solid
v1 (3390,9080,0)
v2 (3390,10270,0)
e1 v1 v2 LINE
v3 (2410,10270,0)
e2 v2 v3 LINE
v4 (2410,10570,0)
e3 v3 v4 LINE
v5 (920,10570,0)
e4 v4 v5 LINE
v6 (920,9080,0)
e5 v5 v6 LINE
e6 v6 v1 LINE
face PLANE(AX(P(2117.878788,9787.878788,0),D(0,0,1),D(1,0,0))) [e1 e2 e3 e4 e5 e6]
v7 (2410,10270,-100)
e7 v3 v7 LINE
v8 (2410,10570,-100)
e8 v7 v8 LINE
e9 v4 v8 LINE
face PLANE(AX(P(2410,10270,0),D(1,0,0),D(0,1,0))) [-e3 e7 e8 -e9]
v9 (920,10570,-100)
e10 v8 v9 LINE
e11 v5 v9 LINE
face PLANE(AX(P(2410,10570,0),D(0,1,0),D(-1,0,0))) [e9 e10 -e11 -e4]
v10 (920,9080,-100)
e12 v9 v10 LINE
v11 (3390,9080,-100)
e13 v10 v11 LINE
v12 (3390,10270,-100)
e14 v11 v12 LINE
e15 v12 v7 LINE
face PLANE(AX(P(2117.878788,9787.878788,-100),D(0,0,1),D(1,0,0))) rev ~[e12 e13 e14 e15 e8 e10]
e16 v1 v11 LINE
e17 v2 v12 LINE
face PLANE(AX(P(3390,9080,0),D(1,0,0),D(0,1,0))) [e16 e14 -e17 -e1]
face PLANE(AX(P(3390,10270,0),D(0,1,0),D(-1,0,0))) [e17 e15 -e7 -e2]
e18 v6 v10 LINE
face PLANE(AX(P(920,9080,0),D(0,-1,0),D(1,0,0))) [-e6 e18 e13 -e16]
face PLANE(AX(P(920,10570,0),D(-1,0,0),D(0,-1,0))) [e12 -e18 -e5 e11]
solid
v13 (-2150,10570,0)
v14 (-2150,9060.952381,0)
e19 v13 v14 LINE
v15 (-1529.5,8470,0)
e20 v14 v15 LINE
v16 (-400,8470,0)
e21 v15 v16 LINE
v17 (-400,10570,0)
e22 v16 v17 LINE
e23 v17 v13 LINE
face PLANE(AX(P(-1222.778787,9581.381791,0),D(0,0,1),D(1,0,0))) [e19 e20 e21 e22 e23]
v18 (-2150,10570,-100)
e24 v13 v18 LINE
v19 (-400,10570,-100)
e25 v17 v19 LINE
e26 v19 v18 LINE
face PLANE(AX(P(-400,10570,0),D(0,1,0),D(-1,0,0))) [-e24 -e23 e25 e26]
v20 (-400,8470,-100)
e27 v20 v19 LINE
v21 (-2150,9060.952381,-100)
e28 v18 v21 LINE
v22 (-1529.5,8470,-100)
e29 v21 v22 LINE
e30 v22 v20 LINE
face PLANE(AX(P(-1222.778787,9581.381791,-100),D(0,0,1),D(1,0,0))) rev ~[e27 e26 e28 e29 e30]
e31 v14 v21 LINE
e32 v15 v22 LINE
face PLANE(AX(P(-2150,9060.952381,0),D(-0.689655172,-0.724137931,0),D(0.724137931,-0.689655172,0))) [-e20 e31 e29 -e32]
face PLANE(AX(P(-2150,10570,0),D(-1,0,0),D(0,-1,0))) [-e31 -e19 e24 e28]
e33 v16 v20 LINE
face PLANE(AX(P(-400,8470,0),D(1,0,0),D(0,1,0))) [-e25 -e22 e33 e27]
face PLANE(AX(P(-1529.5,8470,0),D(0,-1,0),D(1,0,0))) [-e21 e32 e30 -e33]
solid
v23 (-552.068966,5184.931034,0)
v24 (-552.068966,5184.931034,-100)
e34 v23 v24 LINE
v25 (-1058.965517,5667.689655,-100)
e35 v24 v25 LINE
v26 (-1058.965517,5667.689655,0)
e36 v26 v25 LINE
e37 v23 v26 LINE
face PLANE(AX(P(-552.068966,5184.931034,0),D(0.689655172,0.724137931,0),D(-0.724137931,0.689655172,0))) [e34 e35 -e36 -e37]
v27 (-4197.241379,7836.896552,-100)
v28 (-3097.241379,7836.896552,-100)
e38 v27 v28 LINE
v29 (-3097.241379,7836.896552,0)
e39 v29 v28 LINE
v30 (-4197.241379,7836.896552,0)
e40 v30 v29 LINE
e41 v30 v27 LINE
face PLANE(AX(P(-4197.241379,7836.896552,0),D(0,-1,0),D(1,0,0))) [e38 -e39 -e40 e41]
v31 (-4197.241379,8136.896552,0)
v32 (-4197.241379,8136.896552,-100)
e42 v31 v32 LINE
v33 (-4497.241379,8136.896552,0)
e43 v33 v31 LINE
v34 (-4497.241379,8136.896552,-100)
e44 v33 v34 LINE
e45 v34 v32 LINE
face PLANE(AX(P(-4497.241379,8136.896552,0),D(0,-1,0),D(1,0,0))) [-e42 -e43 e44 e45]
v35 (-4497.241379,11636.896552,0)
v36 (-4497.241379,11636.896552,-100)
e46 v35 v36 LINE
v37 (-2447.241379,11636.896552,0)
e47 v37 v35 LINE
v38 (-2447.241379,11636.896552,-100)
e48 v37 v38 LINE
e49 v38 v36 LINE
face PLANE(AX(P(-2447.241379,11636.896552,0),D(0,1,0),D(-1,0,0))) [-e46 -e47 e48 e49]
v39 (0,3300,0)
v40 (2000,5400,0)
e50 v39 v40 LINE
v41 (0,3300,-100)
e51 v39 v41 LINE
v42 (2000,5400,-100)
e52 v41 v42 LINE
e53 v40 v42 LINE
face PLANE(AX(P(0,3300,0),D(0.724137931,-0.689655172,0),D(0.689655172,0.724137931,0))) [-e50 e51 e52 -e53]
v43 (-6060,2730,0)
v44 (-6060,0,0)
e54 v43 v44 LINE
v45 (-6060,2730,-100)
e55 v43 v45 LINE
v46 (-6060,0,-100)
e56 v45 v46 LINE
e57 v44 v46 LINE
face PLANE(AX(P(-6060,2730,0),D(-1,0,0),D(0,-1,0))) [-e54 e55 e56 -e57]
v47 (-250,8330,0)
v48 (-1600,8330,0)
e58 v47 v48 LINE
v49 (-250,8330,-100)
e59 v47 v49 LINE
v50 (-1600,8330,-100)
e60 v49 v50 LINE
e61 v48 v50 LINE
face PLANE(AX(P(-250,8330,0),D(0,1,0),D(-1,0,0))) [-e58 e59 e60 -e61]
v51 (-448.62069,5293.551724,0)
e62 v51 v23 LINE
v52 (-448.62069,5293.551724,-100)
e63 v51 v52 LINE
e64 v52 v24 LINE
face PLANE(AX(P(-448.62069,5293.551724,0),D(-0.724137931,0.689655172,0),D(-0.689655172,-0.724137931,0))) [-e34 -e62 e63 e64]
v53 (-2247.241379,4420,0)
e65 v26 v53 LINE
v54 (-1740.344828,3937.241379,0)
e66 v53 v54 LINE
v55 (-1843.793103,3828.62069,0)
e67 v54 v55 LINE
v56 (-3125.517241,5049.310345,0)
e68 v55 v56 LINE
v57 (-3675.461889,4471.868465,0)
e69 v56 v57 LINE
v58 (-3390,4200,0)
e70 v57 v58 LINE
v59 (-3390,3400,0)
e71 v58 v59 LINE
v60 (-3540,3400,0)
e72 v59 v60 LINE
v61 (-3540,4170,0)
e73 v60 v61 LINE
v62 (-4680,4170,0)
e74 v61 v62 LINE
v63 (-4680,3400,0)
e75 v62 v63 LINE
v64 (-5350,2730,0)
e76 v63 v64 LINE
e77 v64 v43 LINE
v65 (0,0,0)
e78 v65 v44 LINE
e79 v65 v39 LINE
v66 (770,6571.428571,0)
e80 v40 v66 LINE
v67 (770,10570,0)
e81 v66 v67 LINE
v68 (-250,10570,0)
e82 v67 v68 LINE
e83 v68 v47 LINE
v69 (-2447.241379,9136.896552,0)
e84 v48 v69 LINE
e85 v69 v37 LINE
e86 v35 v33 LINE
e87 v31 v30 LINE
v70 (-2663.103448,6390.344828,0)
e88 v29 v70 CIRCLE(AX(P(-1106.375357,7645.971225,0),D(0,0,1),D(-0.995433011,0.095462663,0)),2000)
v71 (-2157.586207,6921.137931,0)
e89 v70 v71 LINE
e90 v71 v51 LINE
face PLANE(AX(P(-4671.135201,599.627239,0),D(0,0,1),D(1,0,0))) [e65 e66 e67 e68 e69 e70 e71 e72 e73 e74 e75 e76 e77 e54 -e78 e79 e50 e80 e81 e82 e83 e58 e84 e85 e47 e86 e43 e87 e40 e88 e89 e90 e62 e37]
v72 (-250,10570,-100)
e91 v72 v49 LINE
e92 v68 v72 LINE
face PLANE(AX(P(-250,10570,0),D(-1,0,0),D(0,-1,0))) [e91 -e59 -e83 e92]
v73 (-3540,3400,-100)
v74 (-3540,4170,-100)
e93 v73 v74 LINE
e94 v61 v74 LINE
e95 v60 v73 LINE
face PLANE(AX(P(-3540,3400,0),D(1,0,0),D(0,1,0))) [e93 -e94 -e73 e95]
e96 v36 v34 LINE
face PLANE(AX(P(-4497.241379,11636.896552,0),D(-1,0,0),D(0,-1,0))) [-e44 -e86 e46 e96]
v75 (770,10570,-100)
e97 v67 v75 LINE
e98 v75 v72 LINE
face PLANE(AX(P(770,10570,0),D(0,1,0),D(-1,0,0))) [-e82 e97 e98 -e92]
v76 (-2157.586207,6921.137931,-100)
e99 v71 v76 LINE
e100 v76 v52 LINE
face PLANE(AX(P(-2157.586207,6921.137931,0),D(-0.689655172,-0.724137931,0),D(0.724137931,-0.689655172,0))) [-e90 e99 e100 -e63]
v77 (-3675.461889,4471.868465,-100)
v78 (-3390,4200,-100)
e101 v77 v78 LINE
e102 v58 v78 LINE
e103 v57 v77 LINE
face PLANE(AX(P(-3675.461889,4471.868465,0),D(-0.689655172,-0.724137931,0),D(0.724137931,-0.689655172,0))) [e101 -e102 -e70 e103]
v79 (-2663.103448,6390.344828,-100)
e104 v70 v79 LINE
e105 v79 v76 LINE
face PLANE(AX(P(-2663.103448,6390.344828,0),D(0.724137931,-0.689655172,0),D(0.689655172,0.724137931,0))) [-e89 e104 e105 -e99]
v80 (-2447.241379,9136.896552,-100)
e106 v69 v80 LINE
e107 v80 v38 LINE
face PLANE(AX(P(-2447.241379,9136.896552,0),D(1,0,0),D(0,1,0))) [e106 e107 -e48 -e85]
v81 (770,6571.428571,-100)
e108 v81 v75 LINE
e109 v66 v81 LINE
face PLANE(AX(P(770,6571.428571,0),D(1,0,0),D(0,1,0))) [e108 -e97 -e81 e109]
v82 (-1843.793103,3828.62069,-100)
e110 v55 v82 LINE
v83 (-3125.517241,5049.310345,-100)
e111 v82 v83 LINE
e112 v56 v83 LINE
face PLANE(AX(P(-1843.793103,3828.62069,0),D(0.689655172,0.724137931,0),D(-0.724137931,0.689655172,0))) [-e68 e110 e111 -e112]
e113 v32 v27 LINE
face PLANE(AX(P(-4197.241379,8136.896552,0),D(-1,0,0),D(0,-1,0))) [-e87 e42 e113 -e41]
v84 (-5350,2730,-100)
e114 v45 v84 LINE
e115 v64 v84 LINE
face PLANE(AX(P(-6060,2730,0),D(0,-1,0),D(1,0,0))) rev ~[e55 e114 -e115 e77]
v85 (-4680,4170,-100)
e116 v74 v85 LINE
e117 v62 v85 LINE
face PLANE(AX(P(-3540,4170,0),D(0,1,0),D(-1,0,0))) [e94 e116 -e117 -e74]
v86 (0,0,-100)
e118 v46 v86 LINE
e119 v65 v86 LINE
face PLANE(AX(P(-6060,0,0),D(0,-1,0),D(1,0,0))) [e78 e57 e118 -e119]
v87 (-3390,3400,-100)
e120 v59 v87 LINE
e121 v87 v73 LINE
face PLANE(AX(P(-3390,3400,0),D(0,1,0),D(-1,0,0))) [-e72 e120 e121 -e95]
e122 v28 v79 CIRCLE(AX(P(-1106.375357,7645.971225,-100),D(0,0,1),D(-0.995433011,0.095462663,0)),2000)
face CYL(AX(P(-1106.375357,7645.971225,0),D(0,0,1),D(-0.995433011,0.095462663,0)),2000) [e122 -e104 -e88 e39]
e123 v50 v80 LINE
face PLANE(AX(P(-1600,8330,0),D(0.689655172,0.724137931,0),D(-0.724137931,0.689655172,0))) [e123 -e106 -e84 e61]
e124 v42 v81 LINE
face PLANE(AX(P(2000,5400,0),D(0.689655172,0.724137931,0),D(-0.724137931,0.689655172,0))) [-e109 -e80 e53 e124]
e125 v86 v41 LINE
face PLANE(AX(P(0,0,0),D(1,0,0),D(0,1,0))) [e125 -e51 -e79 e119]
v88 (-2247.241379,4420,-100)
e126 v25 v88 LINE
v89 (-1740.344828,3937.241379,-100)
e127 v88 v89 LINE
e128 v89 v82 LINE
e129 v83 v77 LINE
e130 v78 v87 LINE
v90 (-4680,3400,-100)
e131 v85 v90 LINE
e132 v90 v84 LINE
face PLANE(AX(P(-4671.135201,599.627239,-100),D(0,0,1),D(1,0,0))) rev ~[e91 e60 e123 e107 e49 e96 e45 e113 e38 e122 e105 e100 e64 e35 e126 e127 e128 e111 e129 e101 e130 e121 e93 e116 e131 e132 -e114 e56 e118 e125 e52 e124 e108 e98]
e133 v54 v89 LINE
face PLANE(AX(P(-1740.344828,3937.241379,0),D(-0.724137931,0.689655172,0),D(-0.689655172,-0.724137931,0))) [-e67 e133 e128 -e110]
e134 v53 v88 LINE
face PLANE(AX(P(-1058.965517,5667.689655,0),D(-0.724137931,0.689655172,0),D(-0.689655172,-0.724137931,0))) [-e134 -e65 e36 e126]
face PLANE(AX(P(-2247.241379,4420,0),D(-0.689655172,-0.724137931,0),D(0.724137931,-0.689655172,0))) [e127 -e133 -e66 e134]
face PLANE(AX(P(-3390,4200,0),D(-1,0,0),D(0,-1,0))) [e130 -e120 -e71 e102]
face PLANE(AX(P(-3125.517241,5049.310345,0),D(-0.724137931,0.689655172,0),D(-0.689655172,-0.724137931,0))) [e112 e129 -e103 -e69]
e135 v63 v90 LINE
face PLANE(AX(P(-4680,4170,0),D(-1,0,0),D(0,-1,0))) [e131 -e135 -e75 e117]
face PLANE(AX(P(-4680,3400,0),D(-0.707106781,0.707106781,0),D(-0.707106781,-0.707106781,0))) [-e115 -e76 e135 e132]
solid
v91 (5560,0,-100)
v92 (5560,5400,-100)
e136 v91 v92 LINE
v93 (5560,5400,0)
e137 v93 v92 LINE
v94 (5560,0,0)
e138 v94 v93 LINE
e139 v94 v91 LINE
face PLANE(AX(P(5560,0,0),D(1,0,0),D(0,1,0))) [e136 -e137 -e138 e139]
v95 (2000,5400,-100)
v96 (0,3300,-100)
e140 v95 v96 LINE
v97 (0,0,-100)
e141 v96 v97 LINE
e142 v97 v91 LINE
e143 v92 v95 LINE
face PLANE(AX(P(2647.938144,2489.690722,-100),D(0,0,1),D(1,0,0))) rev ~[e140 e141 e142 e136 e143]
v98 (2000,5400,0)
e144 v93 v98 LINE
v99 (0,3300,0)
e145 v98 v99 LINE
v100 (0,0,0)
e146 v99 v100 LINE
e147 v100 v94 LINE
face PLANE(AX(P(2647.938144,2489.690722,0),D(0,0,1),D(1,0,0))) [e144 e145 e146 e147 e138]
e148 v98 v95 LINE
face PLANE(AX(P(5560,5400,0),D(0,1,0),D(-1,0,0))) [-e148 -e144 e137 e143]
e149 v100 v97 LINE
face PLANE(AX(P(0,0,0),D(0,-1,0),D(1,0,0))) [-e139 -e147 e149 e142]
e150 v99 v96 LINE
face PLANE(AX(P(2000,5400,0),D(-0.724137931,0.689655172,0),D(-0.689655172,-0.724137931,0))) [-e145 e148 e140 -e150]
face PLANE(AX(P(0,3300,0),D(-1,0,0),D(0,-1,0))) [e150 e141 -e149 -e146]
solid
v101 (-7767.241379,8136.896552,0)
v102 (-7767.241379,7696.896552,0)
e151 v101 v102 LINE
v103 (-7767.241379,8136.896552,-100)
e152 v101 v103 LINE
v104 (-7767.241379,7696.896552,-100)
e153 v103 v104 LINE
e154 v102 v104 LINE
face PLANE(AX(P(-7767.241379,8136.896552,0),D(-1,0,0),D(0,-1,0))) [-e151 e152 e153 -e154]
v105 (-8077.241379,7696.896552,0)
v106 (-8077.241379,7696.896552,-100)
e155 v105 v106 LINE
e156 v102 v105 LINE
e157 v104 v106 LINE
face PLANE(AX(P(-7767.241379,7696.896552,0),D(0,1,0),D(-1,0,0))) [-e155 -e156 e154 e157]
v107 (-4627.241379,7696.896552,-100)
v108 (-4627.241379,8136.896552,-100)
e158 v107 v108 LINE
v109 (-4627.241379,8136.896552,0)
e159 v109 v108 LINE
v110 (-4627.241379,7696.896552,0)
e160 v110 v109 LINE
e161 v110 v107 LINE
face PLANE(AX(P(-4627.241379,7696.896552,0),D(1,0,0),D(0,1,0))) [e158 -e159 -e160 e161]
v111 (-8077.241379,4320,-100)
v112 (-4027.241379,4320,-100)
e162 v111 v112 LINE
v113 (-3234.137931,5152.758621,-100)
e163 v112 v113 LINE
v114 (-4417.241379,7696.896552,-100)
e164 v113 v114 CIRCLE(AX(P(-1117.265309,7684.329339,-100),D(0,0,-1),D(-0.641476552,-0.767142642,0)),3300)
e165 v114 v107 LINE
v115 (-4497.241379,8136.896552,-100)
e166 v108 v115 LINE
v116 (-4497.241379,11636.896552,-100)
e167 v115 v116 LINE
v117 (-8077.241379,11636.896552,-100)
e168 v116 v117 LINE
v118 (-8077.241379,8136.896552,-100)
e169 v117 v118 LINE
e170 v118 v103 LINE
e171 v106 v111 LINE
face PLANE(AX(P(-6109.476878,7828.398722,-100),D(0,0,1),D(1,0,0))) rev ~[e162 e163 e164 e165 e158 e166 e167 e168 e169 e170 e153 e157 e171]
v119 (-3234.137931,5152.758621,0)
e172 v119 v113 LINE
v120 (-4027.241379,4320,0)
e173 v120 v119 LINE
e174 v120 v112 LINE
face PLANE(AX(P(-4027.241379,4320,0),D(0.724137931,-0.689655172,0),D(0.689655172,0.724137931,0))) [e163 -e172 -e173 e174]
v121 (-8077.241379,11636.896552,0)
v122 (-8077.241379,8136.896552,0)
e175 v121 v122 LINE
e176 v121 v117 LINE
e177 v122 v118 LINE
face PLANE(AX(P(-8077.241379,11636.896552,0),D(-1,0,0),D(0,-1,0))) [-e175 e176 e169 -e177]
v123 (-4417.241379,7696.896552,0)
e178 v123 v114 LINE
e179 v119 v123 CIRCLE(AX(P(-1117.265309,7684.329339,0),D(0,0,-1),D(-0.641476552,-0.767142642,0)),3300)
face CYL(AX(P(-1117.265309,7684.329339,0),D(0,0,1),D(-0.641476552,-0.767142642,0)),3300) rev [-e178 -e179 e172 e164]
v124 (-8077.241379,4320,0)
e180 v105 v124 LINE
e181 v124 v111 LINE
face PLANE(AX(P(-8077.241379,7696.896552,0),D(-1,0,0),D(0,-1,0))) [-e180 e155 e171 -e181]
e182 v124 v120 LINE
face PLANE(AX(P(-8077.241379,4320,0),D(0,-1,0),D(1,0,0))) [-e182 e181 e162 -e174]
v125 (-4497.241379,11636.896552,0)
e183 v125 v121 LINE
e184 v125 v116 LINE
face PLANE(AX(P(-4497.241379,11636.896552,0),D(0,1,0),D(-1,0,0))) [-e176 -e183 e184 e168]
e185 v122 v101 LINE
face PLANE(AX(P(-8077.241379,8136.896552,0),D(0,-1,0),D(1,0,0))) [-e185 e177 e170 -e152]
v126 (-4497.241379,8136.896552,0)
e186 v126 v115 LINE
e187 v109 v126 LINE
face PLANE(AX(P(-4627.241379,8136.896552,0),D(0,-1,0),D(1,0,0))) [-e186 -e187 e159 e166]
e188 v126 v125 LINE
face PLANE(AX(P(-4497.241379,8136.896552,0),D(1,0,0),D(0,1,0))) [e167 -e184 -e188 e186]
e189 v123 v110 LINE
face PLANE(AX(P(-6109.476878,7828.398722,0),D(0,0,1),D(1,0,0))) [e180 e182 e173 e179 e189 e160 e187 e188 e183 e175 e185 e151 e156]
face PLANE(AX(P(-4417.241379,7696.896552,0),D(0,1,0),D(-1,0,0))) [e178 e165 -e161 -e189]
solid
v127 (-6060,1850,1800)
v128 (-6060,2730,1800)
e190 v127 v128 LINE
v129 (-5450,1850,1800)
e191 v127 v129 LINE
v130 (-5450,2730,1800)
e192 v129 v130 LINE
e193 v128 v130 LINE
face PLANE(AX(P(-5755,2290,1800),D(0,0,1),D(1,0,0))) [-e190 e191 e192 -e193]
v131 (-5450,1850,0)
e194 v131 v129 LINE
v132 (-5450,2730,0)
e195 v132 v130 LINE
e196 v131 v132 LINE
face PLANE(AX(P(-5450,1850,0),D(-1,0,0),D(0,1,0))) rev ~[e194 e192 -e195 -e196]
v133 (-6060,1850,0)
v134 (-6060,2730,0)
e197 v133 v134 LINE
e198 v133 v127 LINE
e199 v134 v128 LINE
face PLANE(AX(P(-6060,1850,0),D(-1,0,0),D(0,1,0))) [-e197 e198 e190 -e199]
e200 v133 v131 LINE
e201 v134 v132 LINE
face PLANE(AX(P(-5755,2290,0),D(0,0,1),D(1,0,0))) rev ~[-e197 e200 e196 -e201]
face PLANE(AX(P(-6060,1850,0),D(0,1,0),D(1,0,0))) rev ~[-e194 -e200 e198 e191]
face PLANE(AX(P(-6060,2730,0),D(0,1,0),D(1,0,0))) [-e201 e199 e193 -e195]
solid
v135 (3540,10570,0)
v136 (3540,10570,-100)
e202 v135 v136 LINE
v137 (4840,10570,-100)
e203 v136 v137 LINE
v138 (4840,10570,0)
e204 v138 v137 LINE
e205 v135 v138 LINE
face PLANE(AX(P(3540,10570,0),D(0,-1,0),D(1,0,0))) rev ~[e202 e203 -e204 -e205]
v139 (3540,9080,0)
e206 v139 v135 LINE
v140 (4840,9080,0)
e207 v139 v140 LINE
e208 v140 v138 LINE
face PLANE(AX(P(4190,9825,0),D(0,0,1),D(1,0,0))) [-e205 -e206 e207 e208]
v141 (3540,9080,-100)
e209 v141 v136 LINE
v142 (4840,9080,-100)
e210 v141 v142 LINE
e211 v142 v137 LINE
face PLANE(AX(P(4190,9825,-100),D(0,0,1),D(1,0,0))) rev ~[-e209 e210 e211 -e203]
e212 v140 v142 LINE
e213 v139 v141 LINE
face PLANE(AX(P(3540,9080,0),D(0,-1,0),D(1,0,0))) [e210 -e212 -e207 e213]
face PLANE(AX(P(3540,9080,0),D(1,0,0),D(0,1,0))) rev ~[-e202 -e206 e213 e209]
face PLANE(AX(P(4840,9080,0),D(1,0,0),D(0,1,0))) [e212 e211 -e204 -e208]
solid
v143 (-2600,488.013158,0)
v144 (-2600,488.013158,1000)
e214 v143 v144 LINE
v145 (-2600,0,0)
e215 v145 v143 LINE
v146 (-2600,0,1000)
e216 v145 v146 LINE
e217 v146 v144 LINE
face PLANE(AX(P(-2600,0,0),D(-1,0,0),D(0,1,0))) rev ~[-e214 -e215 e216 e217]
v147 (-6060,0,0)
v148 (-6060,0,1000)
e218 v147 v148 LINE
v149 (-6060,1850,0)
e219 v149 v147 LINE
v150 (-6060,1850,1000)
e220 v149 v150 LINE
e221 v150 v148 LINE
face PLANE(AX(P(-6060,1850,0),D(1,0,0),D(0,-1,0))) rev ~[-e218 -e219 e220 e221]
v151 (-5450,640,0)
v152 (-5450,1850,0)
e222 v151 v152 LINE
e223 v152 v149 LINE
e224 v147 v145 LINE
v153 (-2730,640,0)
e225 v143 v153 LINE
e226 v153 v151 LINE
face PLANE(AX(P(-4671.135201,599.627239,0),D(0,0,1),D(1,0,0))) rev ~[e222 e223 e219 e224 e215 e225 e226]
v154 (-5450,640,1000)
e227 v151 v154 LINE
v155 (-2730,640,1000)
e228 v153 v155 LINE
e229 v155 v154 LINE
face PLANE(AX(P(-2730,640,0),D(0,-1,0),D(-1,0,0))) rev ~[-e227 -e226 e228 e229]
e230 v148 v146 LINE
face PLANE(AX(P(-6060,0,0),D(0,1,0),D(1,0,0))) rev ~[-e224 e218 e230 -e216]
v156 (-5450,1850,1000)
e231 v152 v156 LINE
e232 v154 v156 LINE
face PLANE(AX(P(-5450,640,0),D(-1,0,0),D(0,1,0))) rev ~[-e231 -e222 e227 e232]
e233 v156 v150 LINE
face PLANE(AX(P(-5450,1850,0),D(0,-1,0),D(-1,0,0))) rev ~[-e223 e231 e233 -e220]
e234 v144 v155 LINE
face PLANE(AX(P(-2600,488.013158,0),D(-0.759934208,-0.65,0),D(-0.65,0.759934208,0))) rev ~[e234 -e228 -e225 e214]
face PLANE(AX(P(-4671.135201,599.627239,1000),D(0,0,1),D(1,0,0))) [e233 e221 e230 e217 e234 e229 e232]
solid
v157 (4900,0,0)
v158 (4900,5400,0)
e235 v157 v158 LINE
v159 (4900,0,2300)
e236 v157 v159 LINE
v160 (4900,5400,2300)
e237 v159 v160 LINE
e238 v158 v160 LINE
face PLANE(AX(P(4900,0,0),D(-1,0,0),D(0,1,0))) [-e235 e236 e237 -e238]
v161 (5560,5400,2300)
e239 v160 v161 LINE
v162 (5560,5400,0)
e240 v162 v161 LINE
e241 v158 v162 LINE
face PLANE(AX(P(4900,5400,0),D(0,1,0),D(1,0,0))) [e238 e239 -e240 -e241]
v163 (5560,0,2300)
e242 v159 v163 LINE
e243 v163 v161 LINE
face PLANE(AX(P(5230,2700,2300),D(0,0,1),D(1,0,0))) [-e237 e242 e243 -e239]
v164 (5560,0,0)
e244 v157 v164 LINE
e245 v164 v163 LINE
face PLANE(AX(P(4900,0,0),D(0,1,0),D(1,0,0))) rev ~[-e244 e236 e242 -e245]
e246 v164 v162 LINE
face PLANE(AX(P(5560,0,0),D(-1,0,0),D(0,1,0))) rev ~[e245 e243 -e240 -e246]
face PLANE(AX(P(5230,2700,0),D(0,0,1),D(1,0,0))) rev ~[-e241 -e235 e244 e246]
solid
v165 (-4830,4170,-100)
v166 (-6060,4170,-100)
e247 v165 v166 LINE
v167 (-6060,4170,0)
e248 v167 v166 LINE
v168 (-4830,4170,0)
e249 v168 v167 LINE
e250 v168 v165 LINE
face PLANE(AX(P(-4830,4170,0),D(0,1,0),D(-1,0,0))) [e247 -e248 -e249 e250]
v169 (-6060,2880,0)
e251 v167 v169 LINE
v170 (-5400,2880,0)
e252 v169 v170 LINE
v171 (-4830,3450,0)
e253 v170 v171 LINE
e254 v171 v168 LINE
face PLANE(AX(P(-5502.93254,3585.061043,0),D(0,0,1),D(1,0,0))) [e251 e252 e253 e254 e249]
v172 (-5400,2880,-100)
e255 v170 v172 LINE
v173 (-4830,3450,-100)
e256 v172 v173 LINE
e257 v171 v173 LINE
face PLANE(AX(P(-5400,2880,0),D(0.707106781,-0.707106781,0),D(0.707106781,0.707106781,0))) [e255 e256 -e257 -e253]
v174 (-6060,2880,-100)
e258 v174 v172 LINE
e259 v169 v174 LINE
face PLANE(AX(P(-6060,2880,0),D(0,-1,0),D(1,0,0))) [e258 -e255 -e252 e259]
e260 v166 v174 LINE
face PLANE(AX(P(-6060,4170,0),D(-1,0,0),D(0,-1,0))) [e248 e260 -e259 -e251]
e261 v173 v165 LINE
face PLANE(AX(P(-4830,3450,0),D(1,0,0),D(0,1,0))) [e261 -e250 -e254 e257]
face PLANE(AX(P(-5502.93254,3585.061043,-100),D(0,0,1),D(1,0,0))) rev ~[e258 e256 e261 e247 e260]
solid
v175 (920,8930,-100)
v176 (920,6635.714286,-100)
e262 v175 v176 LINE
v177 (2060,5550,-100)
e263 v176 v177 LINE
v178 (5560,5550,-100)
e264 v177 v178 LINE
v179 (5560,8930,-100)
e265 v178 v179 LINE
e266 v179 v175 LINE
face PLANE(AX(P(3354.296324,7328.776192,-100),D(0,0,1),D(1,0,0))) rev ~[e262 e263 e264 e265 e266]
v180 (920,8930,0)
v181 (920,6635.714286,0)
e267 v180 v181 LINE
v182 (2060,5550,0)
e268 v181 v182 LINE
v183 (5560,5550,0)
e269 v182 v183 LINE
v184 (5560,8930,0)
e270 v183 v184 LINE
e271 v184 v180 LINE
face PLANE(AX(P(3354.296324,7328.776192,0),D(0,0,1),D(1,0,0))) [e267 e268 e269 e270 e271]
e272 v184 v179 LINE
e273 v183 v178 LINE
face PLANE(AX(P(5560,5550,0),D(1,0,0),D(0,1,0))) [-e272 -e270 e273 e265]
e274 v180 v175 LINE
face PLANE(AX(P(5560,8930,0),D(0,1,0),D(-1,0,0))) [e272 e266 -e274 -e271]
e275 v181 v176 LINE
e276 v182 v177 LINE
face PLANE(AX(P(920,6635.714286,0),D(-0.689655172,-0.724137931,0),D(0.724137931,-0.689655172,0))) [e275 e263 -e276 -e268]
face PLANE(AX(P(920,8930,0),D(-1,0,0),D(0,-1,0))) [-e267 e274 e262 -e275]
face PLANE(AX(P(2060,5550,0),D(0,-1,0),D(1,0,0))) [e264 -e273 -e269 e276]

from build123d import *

# Parameters (mm, degrees)
F1_DEPTH  = 100
F0_W      = 660
F0_H      = 5400
F2_DEPTH  = 100
F3_DEPTH  = 100
F4_DEPTH  = 100
F5_DEPTH  = 100
F0_W_2    = 1300
F0_H_2    = 1490
F6_DEPTH  = 100
F7_DEPTH  = 100
F0_W_3    = 610
F0_H_3    = 880
F8_DEPTH  = 100
F9_DEPTH  = 1000
F10_DEPTH = 1800
F11_DEPTH = 2300


# Not quite as in the source:
# - a feature names something its author has since deleted; it is built from what else it names


with BuildPart() as f1:
    # F0 (on Top) → F1 (new body)
    with BuildSketch(Plane.XY):
        with BuildLine():
            Line((-2600, 488.0131584643), (-2600, 0))
            Line((-2600, 0), (0, 0))
            Line((0, 0), (0, 3300))
            Line((0, 3300), (2000, 5400))
            Line((2000, 5400), (770, 6571.4285714286))
            Line((770, 6571.4285714286), (770, 10570))
            Line((770, 10570), (-250, 10570))
            Line((-250, 10570), (-250, 8330))
            Line((-250, 8330), (-1600, 8330))
            Line((-1600, 8330), (-2447.2413793103, 9136.8965517241))
            Line((-2447.2413793103, 9136.8965517241), (-2447.2413793103, 11636.8965517241))
            Line((-2447.2413793103, 11636.8965517241), (-4497.2413793103, 11636.8965517241))
            Line((-4497.2413793103, 11636.8965517241), (-4497.2413793103, 8136.8965517241))
            Line((-4497.2413793103, 8136.8965517241), (-4197.2413793103, 8136.8965517241))
            Line((-4197.2413793103, 8136.8965517241), (-4197.2413793103, 7836.8965517241))
            Line((-4197.2413793103, 7836.8965517241), (-3097.2413793103, 7836.8965517241))
            ThreePointArc((-3097.2413793103, 7836.8965517241), (-3021.9650759345, 7071.0659908147), (-2663.1034482759, 6390.3448275862))
            Line((-2663.1034482759, 6390.3448275862), (-2157.5862068966, 6921.1379310345))
            Line((-2157.5862068966, 6921.1379310345), (-448.6206896552, 5293.5517241379))
            Line((-448.6206896552, 5293.5517241379), (-552.0689655172, 5184.9310344828))
            Line((-552.0689655172, 5184.9310344828), (-1058.9655172414, 5667.6896551724))
            Line((-1058.9655172414, 5667.6896551724), (-2247.2413793103, 4420))
            Line((-2247.2413793103, 4420), (-1740.3448275862, 3937.2413793103))
            Line((-1740.3448275862, 3937.2413793103), (-1843.7931034483, 3828.6206896552))
            Line((-1843.7931034483, 3828.6206896552), (-3125.5172413793, 5049.3103448276))
            Line((-3125.5172413793, 5049.3103448276), (-3675.4618885563, 4471.8684652917))
            Line((-3675.4618885563, 4471.8684652917), (-3390, 4200))
            Line((-3390, 4200), (-3390, 3400))
            Line((-3390, 3400), (-3540, 3400))
            Line((-3540, 3400), (-3540, 4170))
            Line((-3540, 4170), (-4680, 4170))
            Line((-4680, 4170), (-4680, 3400))
            Line((-4680, 3400), (-4821.4213562373, 3258.5786437627))
            Line((-4821.4213562373, 3258.5786437627), (-5350, 2730))
            Line((-5350, 2730), (-5450, 2730))
            Line((-5450, 2730), (-5450, 1850))
            Line((-5450, 1850), (-5450, 640))
            Line((-5450, 640), (-2730, 640))
            Line((-2730, 640), (-2600, 488.0131584643))
        make_face()
    extrude(amount=-F1_DEPTH)

    # F0 (on Top) → F8 (join)
    with BuildSketch(Plane.XY):
        Polygon((-6060, 0), (-2600, 0), (-2600, 488.0131584643), (-2730, 640), (-5450, 640), (-5450, 1850), (-6060, 1850), align=None)
        with Locations((-5755, 2290)):
            Rectangle(F0_W_3, F0_H_3)
    extrude(amount=-F8_DEPTH)


with BuildPart() as f1b:
    # F0 (on Top) → F1, piece 2 (new body)
    with BuildSketch(Plane.XY):
        Polygon((-6060, 4170), (-6060, 2880), (-5400, 2880), (-4921.4213562373, 3358.5786437627), (-4830, 3450), (-4830, 4170), (-5900, 4170), align=None)
    extrude(amount=-F1_DEPTH)


with BuildPart() as f2:
    # F0 (on Top) → F2 (new body)
    with BuildSketch(Plane.XY):
        Polygon((0, 3300), (0, 0), (4900, 0), (4900, 5400), (2000, 5400), align=None)
        with Locations((5230, 2700)):
            Rectangle(F0_W, F0_H)
    extrude(amount=-F2_DEPTH)


with BuildPart() as f3:
    # F0 (on Top) → F3 (new body)
    with BuildSketch(Plane.XY):
        with BuildLine():
            Line((-8077.2413793103, 4320), (-6060, 4320))
            Line((-6060, 4320), (-4027.2413793103, 4320))
            Line((-4027.2413793103, 4320), (-3234.1379310345, 5152.7586206897))
            ThreePointArc((-3234.1379310345, 5152.7586206897), (-4109.5423503056, 6292.8272342142), (-4417.2413793103, 7696.8965517241))
            Line((-4417.2413793103, 7696.8965517241), (-4627.2413793103, 7696.8965517241))
            Line((-4627.2413793103, 7696.8965517241), (-4627.2413793103, 8136.8965517241))
            Line((-4627.2413793103, 8136.8965517241), (-4497.2413793103, 8136.8965517241))
            Line((-4497.2413793103, 8136.8965517241), (-4497.2413793103, 11636.8965517241))
            Line((-4497.2413793103, 11636.8965517241), (-8077.2413793103, 11636.8965517241))
            Line((-8077.2413793103, 11636.8965517241), (-8077.2413793103, 8136.8965517241))
            Line((-8077.2413793103, 8136.8965517241), (-7767.2413793103, 8136.8965517241))
            Line((-7767.2413793103, 8136.8965517241), (-7767.2413793103, 7696.8965517241))
            Line((-7767.2413793103, 7696.8965517241), (-8077.2413793103, 7696.8965517241))
            Line((-8077.2413793103, 7696.8965517241), (-8077.2413793103, 4320))
        make_face()
    extrude(amount=-F3_DEPTH)


with BuildPart() as f4:
    # F0 (on Top) → F4 (new body)
    with BuildSketch(Plane.XY):
        Polygon((-400, 8470), (-400, 10570), (-2150, 10570), (-2150, 9060.9523809524), (-1529.5, 8470), align=None)
    extrude(amount=-F4_DEPTH)


with BuildPart() as f5:
    # F0 (on Top) → F5 (new body)
    with BuildSketch(Plane.XY):
        Polygon((4900, 5550), (5560, 5550), (5560, 8930), (920, 8930), (920, 6635.7142857143), (2060, 5550), align=None)
    extrude(amount=-F5_DEPTH)


with BuildPart() as f6:
    # F0 (on Top) → F6 (new body)
    with BuildSketch(Plane.XY):
        with Locations((4190, 9825)):
            Rectangle(F0_W_2, F0_H_2)
    extrude(amount=-F6_DEPTH)


with BuildPart() as f7:
    # F0 (on Top) → F7 (new body)
    with BuildSketch(Plane.XY):
        Polygon((2410, 10570), (920, 10570), (920, 9080), (3390, 9080), (3390, 10270), (2410, 10270), align=None)
    extrude(amount=-F7_DEPTH)


with BuildPart() as f9:
    # F0 (on Top) → F9 (new body)
    with BuildSketch(Plane.XY):
        Polygon((-6060, 0), (-2600, 0), (-2600, 488.0131584643), (-2730, 640), (-5450, 640), (-5450, 1850), (-6060, 1850), align=None)
    extrude(amount=F9_DEPTH)


with BuildPart() as f10:
    # F0 (on Top) → F10 (new body)
    with BuildSketch(Plane.XY):
        with Locations((-5755, 2290)):
            Rectangle(F0_W_3, F0_H_3)
    extrude(amount=F10_DEPTH)


with BuildPart() as f11:
    # F0 (on Top) → F11 (new body)
    with BuildSketch(Plane.XY):
        with Locations((5230, 2700)):
            Rectangle(F0_W, F0_H)
    extrude(amount=F11_DEPTH)


solid = Compound([f1.part, f1b.part, f2.part, f3.part, f4.part, f5.part, f6.part, f7.part, f9.part, f10.part, f11.part])
